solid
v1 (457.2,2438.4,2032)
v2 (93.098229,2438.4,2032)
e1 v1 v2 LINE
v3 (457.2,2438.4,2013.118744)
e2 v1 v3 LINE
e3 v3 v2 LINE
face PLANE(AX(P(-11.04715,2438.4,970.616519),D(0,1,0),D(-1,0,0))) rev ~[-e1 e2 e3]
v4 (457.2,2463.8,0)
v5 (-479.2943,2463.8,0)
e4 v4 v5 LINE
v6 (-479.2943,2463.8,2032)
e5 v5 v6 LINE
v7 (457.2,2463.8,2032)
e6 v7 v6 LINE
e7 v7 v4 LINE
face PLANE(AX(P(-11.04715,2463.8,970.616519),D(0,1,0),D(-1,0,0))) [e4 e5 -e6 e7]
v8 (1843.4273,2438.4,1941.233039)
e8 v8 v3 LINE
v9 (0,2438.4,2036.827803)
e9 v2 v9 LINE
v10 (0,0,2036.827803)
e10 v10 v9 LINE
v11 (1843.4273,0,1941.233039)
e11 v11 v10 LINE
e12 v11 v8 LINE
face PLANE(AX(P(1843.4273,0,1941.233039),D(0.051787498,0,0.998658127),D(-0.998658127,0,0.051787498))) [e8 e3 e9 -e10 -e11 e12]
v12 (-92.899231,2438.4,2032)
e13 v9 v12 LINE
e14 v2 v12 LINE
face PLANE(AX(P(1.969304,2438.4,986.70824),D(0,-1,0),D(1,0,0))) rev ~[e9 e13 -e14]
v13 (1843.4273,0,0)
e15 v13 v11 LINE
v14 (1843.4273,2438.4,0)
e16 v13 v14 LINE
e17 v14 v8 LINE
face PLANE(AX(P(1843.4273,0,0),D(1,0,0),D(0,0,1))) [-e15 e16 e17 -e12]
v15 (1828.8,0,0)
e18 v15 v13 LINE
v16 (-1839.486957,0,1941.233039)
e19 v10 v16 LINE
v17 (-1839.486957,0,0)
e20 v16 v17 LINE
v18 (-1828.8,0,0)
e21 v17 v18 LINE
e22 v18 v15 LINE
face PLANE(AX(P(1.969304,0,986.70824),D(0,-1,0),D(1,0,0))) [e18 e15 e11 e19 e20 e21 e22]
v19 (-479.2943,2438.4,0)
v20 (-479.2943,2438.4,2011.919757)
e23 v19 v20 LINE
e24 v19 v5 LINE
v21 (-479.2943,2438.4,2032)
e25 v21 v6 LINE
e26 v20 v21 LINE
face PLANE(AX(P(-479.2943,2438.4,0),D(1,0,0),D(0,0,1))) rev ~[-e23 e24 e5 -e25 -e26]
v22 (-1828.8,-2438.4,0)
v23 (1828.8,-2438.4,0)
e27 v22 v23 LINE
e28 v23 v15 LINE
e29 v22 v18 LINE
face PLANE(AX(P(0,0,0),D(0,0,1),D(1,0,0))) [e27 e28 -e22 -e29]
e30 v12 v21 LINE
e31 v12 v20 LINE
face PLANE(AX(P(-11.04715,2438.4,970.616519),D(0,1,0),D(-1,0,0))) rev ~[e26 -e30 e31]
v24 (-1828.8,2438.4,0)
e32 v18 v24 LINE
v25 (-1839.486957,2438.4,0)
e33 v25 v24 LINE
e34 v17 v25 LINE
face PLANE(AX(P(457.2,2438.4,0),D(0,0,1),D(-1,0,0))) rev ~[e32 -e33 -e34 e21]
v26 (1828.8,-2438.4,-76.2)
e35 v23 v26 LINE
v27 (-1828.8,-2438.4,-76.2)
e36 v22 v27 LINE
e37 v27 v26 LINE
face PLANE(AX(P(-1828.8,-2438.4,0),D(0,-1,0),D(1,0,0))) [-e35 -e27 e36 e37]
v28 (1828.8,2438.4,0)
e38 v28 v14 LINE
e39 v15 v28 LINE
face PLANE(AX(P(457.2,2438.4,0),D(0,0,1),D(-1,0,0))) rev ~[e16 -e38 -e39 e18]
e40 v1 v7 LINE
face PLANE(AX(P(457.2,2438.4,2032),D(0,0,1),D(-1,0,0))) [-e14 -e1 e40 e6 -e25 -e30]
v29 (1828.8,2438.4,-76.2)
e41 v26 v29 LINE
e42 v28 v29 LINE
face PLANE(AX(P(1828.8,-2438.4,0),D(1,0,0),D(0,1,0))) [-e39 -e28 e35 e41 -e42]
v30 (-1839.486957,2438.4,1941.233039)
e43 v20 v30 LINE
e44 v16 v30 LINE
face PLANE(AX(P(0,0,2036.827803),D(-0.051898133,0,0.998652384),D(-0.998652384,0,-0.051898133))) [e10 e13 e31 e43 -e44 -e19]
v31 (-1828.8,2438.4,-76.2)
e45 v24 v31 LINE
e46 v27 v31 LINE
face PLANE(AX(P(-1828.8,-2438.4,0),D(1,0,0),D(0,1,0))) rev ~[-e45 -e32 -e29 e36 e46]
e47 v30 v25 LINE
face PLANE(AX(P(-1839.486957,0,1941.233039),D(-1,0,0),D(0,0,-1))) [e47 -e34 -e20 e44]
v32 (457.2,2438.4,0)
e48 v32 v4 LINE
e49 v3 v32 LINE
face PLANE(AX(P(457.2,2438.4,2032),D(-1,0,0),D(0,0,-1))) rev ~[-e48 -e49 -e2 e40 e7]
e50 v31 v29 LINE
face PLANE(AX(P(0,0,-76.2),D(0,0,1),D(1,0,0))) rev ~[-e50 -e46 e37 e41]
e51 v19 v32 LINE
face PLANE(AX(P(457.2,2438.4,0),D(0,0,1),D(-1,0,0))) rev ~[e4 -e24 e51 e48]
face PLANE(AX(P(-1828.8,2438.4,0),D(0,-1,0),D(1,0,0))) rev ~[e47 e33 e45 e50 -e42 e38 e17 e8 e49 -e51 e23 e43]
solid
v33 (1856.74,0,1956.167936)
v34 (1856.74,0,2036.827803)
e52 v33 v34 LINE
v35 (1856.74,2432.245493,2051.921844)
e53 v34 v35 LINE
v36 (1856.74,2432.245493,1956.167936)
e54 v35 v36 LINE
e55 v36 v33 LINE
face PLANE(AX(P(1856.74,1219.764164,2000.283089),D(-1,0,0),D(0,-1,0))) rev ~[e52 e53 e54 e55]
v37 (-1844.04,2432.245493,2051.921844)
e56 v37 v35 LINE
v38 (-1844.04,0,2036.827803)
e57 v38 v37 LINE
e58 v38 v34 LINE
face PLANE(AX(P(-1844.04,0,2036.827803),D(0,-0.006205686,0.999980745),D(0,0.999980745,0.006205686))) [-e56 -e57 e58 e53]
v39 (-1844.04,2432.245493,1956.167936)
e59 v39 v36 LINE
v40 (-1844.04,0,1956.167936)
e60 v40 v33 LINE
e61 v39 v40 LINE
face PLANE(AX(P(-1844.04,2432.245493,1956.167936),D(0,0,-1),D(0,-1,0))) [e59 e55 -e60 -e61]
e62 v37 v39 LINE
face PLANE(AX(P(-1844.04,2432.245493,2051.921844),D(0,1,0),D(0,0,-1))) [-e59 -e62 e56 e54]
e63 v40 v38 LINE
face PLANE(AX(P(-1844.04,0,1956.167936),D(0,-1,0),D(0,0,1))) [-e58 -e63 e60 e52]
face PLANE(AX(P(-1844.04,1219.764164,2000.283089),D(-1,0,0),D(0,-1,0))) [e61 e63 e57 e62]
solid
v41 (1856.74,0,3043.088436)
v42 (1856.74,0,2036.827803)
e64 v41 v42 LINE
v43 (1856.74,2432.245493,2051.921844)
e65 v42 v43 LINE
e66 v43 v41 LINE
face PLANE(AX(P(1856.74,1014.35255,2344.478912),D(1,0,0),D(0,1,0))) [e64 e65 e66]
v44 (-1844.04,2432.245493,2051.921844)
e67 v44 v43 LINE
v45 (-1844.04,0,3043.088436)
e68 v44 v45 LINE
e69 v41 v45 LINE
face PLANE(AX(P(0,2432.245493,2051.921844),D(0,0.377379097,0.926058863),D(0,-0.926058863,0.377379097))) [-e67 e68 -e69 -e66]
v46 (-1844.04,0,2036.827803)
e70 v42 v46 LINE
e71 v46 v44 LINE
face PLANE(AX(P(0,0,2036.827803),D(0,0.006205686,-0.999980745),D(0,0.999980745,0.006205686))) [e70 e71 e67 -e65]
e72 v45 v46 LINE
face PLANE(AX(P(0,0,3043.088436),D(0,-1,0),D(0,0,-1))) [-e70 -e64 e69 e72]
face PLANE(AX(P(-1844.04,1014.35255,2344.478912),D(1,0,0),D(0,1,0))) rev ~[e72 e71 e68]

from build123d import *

# Parameters (mm, degrees)
F2_DEPTH  = 2438.4
F4_DEPTH  = 1856.74
F5_DEPTH  = 1844.04
F8_DEPTH  = 3700.78
F9_W      = 936.4943000793
F9_H      = 90.7669610977
F10_DEPTH = 25.4
F0_W      = 3657.6
F0_H      = 4876.8
F11_DEPTH = 76.2


with BuildPart() as f2:
    # F1 (on Front) → F2 (new body)
    with BuildSketch(Plane.XZ):
        Polygon((-1839.4869565964, 0), (1843.4273004532, 0), (1843.4273004532, 1941.2330389023), (0, 2036.8278026581), (-1839.4869565964, 1941.2330389023), align=None)
    extrude(amount=-F2_DEPTH)

    # F9 (on face) → F10 (join)
    with BuildSketch(Plane(origin=(0, 2438.4, 0), x_dir=(-1, 0, 0), z_dir=(0, 1, 0))):
        Polygon((-457.2, 0), (0, 0), (479.2943000793, 0), (479.2943000793, 1941.2330389023), (-457.2, 1941.2330389023), align=None)
        with Locations((11.0471500397, 1986.6165194511)):
            Rectangle(F9_W, F9_H)
    extrude(amount=F10_DEPTH)

    # F0 (on Top) → F11 (join)
    with BuildSketch(Plane.XY):
        Rectangle(F0_W, F0_H)
    extrude(amount=-F11_DEPTH)


with BuildPart() as f4:
    # F3 (on Right) → F4 (new body)
    with BuildSketch(Plane.YZ):
        Polygon((0, 2036.8278026581), (2432.2454929352, 2051.9218444824), (0, 3043.0884361267), align=None)
    extrude(amount=F4_DEPTH)

    # F5 (add): a face of the model
    f5_faces = [f4.faces().sort_by_distance(p)[0] for p in [
        (0, 810.7484976451, 2377.2793610891),
    ]]
    extrude(f5_faces, amount=F5_DEPTH)


with BuildPart() as f8:
    # F6 (on face) → F8 (new body)
    with BuildSketch(Plane(origin=(-1844.04, 0, 0), x_dir=(0, -1, 0), z_dir=(-1, 0, 0))):
        Polygon((0, 2036.8278026581), (-2432.2454929352, 2051.9218444824), (-2432.2454929352, 1956.1679363251), (0, 1956.1679363251), align=None)
    extrude(amount=-F8_DEPTH)


solid = Compound([f2.part, f4.part, f8.part])
